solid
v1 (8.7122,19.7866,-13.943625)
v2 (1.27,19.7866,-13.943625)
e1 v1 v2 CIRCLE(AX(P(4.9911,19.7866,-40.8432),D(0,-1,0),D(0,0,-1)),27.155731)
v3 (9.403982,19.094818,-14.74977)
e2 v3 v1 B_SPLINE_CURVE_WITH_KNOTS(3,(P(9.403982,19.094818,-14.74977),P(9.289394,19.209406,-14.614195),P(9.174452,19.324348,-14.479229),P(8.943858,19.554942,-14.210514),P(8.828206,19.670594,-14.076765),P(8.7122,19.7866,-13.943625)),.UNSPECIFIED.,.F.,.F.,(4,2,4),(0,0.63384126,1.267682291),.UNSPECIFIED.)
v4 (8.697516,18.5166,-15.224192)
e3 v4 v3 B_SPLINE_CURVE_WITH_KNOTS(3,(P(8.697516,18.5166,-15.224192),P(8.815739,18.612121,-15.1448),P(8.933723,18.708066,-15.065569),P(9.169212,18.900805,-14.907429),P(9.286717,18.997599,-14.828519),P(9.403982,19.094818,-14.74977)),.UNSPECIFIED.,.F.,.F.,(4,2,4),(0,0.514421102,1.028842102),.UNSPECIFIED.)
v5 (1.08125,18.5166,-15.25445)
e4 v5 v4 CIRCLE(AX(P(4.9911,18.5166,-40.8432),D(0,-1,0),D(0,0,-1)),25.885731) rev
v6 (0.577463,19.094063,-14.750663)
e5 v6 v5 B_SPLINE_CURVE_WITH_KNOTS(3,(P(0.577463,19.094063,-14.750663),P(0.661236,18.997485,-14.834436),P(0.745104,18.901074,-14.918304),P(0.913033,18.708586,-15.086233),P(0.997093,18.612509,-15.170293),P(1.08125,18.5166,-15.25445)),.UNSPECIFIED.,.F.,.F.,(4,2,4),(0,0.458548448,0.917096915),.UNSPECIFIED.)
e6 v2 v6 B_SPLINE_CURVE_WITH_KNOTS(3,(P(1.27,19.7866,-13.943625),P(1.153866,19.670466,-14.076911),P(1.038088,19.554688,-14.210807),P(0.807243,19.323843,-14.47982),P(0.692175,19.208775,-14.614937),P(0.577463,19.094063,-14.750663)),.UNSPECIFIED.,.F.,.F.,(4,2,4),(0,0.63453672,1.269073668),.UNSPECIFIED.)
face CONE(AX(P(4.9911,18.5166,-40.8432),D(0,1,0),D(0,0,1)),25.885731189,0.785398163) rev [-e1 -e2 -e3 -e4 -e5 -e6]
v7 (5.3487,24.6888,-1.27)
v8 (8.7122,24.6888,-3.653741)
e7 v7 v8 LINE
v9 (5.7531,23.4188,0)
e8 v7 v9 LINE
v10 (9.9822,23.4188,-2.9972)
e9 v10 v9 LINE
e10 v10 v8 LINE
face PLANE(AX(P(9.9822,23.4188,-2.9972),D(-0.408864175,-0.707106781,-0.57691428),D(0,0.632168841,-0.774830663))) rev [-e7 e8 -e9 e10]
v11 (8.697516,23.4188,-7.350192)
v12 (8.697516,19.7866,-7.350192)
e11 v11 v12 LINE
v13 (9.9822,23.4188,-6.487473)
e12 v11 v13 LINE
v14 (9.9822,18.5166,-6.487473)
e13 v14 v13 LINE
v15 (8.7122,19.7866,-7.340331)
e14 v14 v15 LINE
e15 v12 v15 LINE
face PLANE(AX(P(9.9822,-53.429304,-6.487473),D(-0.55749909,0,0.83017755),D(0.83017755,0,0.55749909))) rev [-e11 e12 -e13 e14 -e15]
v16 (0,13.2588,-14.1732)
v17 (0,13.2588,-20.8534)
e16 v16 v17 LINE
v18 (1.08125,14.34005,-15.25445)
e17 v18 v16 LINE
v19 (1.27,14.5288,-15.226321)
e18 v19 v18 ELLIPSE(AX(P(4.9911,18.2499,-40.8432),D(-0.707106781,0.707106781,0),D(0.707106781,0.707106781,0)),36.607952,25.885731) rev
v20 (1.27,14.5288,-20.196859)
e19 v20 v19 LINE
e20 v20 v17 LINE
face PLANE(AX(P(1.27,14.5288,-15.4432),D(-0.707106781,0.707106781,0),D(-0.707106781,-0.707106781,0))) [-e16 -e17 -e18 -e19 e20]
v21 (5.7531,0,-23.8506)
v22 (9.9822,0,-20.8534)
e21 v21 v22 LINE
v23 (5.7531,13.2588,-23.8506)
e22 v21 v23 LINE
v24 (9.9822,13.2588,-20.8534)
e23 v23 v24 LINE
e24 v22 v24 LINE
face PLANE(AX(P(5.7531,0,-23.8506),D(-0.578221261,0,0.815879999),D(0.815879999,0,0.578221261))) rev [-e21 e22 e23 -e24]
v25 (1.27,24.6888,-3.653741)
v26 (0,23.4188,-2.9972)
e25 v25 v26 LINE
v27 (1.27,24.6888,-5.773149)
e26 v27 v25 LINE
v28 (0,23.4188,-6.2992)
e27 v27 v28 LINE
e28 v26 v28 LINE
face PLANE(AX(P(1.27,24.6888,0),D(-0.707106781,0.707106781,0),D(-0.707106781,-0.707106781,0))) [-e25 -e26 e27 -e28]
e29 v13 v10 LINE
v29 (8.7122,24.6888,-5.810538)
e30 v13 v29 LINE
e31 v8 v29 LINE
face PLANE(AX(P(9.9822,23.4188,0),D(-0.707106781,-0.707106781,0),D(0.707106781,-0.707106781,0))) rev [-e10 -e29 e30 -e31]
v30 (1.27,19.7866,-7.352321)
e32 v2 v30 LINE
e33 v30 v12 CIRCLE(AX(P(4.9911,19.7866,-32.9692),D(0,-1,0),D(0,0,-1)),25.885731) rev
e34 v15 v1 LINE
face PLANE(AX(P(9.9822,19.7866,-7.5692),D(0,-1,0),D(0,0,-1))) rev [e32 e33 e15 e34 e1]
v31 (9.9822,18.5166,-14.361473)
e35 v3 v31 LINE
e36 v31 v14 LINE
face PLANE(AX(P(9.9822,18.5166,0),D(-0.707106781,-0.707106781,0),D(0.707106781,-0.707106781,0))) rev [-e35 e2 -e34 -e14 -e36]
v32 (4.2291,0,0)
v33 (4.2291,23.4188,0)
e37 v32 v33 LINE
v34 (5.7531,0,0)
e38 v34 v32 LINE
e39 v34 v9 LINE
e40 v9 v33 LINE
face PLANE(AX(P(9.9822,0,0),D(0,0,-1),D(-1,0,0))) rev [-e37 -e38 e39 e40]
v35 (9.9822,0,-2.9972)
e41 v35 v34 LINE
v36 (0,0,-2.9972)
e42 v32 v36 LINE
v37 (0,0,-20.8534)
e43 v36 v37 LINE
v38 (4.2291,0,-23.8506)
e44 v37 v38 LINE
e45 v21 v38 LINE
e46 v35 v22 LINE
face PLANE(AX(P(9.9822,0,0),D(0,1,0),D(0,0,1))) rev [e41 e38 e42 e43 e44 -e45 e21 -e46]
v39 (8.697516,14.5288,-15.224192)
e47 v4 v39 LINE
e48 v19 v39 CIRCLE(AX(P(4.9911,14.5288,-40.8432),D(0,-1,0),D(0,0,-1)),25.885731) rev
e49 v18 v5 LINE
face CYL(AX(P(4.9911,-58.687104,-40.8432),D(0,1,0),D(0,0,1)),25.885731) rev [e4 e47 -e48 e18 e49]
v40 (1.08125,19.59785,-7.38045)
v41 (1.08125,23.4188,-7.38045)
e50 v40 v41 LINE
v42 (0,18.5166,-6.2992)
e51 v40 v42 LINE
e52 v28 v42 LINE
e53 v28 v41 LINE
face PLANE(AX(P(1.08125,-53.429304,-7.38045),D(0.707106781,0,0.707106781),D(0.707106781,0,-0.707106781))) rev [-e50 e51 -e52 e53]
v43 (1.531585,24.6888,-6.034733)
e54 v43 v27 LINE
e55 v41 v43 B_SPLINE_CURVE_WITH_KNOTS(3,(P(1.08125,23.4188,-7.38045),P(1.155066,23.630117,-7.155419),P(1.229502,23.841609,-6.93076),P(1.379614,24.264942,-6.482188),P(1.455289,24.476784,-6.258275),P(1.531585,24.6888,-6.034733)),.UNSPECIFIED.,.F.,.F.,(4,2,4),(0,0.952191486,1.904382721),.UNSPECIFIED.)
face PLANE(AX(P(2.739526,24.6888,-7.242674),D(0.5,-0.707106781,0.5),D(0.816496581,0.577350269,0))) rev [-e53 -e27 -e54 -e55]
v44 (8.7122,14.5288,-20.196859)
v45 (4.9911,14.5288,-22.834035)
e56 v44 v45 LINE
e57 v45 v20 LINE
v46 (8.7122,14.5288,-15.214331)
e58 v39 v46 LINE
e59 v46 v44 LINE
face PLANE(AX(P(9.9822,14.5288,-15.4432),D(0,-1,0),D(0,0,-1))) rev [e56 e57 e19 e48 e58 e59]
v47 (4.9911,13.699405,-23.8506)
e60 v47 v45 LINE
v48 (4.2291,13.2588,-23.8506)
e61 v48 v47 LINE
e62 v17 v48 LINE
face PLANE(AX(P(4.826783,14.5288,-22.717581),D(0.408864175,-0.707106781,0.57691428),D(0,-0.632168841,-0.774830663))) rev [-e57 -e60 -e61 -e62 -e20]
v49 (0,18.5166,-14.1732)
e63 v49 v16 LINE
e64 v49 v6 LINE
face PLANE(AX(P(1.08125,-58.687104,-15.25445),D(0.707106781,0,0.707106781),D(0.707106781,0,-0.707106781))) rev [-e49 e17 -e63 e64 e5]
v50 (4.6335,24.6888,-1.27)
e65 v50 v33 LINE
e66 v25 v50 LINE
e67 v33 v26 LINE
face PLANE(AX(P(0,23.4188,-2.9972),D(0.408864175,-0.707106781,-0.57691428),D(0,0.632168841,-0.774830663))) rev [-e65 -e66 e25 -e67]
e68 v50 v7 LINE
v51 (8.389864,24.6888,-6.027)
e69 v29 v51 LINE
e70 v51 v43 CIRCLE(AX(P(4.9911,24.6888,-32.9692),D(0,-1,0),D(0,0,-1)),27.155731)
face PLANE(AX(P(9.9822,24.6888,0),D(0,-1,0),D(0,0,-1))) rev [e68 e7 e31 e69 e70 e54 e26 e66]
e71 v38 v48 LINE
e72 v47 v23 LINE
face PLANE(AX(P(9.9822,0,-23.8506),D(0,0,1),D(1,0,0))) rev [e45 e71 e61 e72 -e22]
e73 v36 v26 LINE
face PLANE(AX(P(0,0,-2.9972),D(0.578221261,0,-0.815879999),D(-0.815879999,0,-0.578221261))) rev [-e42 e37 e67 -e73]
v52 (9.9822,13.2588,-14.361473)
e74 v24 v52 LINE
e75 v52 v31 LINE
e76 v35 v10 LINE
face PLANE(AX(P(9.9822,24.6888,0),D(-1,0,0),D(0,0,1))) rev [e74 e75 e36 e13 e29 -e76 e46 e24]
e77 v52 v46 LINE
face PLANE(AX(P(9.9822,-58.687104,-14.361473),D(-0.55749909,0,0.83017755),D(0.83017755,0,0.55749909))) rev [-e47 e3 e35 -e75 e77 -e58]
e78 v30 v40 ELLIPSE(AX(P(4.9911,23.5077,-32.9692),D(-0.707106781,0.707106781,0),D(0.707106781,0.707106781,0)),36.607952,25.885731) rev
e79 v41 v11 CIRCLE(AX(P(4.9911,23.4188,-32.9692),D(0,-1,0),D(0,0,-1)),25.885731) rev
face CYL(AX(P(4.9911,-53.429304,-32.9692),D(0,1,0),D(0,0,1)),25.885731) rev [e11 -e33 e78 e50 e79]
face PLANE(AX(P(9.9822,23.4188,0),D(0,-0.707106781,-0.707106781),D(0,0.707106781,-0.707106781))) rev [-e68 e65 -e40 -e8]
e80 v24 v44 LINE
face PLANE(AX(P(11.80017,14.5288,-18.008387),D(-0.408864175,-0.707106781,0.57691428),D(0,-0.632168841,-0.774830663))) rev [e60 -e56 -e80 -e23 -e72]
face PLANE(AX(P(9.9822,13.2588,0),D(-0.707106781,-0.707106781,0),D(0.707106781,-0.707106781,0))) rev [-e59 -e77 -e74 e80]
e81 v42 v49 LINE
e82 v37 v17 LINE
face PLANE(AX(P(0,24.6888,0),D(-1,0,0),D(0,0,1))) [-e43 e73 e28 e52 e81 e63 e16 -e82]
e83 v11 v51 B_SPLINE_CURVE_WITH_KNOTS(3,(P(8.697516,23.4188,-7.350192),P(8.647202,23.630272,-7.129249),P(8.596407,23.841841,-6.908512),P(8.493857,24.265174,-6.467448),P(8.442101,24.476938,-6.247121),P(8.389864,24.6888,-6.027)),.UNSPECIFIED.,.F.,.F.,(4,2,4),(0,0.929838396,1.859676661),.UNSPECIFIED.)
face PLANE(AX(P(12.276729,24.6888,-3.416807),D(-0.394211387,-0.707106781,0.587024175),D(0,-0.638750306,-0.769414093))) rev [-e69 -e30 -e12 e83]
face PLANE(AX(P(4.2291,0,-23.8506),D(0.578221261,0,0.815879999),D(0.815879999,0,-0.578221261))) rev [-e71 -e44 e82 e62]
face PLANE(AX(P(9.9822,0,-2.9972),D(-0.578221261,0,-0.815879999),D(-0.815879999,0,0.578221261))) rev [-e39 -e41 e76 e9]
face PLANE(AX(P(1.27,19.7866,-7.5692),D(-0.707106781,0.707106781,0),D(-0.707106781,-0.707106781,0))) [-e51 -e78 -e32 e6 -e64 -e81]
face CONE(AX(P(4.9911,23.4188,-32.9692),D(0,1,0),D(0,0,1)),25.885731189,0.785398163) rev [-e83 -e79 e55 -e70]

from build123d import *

# Parameters (mm, degrees)
EXTRUDE1_DEPTH     = 9.9822
CUT_EXTRUDE1_DEPTH = 36.749577377
SKETCH3_R          = 25.885731189
CUT_EXTRUDE2_DEPTH = 4.9022
SKETCH4_R          = 25.885731189
CUT_EXTRUDE3_DEPTH = 5.2578
CHAMFER1_SIZE      = 1.08172717
CHAMFER1_SIZE_2    = 1.27
CHAMFER2_SIZE      = 1.27
CHAMFER3_SIZE      = 1.27
CHAMFER4_SIZE      = 1.27


with BuildPart() as part:
    # Sketch1 → Extrude1 (new body)
    with BuildSketch(Plane(origin=(0, 0, 0), x_dir=(0, 0, -1), z_dir=(1, 0, 0))):
        Polygon((7.5692, 24.6888), (7.5692, 19.7866), (15.4432, 19.7866), (15.4432, 14.5288), (23.8506, 14.5288), (23.8506, 0), (0, 0), (0, 24.6888), align=None)
    extrude(amount=EXTRUDE1_DEPTH)

    # Sketch2 → Cut-Extrude1 (cut, through all)
    with BuildSketch(Plane(origin=(0, 24.6888, 0), x_dir=(1, 0, 0), z_dir=(0, 1, 0))):
        Polygon((0, 2.9972), (4.2291, 0), (0, 0), align=None)
        Polygon((9.9822, 2.9972), (9.9822, 0), (5.7531, 0), align=None)
        Polygon((0, 23.8506), (4.2291, 23.8506), (0, 20.8534), align=None)
        Polygon((9.9822, 20.8534), (9.9822, 23.8506), (5.7531, 23.8506), align=None)
    extrude(amount=-CUT_EXTRUDE1_DEPTH, mode=Mode.SUBTRACT)

    # Sketch3 → Cut-Extrude2 (cut)
    with BuildSketch(Plane(origin=(0, 24.6888, 0), x_dir=(1, 0, 0), z_dir=(0, 1, 0))):
        with Locations((4.9911, 32.9692)):
            Circle(SKETCH3_R)
    extrude(amount=-CUT_EXTRUDE2_DEPTH, mode=Mode.SUBTRACT)

    # Sketch4 → Cut-Extrude3 (cut)
    with BuildSketch(Plane(origin=(0, 19.7866, 0), x_dir=(1, 0, 0), z_dir=(0, 1, 0))):
        with Locations((4.9911, 40.8432)):
            Circle(SKETCH4_R)
    extrude(amount=-CUT_EXTRUDE3_DEPTH, mode=Mode.SUBTRACT)

    # Chamfer1
    # the kernel refuses this chamfer: 1.27, 1.08172717 mm, written as the material it takes off along each edge
    with BuildSketch(Plane(origin=(9.9822, 23.137823144, -15.4432), x_dir=(-0.9857782143008734, 0, 0.168051516535202), z_dir=(0, -1, 0))) as chamfer1_piece_1:
        with BuildLine():
            Line((1.303218251, 0), (CHAMFER1_SIZE * 0.168051516609, -CHAMFER1_SIZE * 0.985778214731))
            Line((CHAMFER1_SIZE * 0.168051516609, -CHAMFER1_SIZE * 0.985778214731), (0, 0))
            ThreePointArc((0, 0), (0.67003435, -0.008196065), (1.303218251, 0))
        make_face()
    extrude(amount=8.609023144, mode=Mode.SUBTRACT)
    with BuildSketch(Plane(origin=(9.9822, 28.040023144, -7.5692), x_dir=(0, 0, 1), z_dir=(0, -1, 0))) as chamfer1_piece_2:
        with BuildLine():
            Line((CHAMFER1_SIZE, 0), (0.219007803, 1.28468416))
            ThreePointArc((0.219007803, 1.28468416), (0.12067979, 0.659127904), (0, 0))
            Line((0, 0), (CHAMFER1_SIZE, 0))
        make_face()
    extrude(amount=8.253423144, mode=Mode.SUBTRACT)
    with BuildSketch(Plane(origin=(0, 27.954837395, -7.5692), x_dir=(0.9851028173062452, 0, 0.1719663901327771), z_dir=(0, -1, 0))) as chamfer1_piece_3:
        with BuildLine():
            Line((1.097600724, 0), (CHAMFER1_SIZE_2 * 0.171966390133, CHAMFER1_SIZE_2 * 0.985102817306))
            Line((CHAMFER1_SIZE_2 * 0.171966390133, CHAMFER1_SIZE_2 * 0.985102817306), (0, 0))
            ThreePointArc((0, 0), (0.563419729, 0.005814052), (1.097600724, 0))
        make_face()
    extrude(amount=8.168237395, mode=Mode.SUBTRACT)
    with BuildSketch(Plane(origin=(0, 23.052637395, -15.4432), x_dir=(0.985102817306246, 0, 0.17196639013277196), z_dir=(0, -1, 0))) as chamfer1_piece_4:
        with BuildLine():
            Line((1.097600724, 0), (CHAMFER1_SIZE_2 * 0.171966390133, CHAMFER1_SIZE_2 * 0.985102817306))
            Line((CHAMFER1_SIZE_2 * 0.171966390133, CHAMFER1_SIZE_2 * 0.985102817306), (0, 0))
            ThreePointArc((0, 0), (0.563419729, 0.005814052), (1.097600724, 0))
        make_face()
    extrude(amount=8.523837395, mode=Mode.SUBTRACT)

    # Chamfer2
    # the kernel refuses this chamfer: 1.27 mm, written as the material it takes off along each edge
    with BuildSketch(Plane(origin=(3.088405412, 24.6888, 1.88849226), x_dir=(0, -1, 0), z_dir=(0.8158799994392605, 0, -0.5782212608638604))) as chamfer2_piece_1:
        Polygon((CHAMFER2_SIZE, 0), (0, CHAMFER2_SIZE), (0, 0), align=None)
    extrude(amount=11.715557658, mode=Mode.SUBTRACT)
    with BuildSketch(Plane(origin=(0.963062605, 24.6888, 0), x_dir=(0, 0, -1), z_dir=(1, 0, 0))) as chamfer2_piece_2:
        Polygon((CHAMFER2_SIZE, 0), (0, -CHAMFER2_SIZE), (0, 0), align=None)
    extrude(amount=8.056074789, mode=Mode.SUBTRACT)
    with BuildSketch(Plane(origin=(-2.664694588, 24.6888, -4.88569226), x_dir=(0.5782212608638604, 0, -0.8158799994392603), z_dir=(0.8158799994392604, 0, 0.5782212608638605))) as chamfer2_piece_3:
        Polygon((CHAMFER2_SIZE, 0), (0, -CHAMFER2_SIZE), (0, 0), align=None)
    extrude(amount=11.715557658, mode=Mode.SUBTRACT)
    with BuildSketch(Plane(origin=(0, 24.6888, 0.268837395), x_dir=(1, 0, 0), z_dir=(0, 0, -1))) as chamfer2_piece_4:
        Polygon((CHAMFER2_SIZE, 0), (0, CHAMFER2_SIZE), (0, 0), align=None)
    extrude(amount=9.834074789, mode=Mode.SUBTRACT)
    with BuildSketch(Plane(origin=(3.390686755, 24.6888, -9.689886755), x_dir=(0.7071067811864264, 0, 0.7071067811866687), z_dir=(-0.7071067811866687, 0, 0.7071067811864264))) as chamfer2_piece_5:
        Polygon((CHAMFER2_SIZE, 0), (0, -CHAMFER2_SIZE), (0, 0), align=None)
    extrude(amount=8.061192589, mode=Mode.SUBTRACT)
    with BuildSketch(Plane(origin=(4.9911, 24.6888, -32.9692), x_dir=(-0.27423691753181434, 0, 0.9616621616049208), z_dir=(-0.9616621616049208, 0, -0.27423691753181434))) as chamfer2_piece_6:
        Polygon((25.885731189 + CHAMFER2_SIZE, 0), (25.885731189, -CHAMFER2_SIZE), (25.885731189, 0), align=None)
    revolve(axis=Axis((4.9911, 24.6888, -32.9692), (0, 1, 0)), revolution_arc=31.377850279, mode=Mode.SUBTRACT)
    with BuildSketch(Plane(origin=(12.693590923, 24.6888, -4.666659955), x_dir=(-0.5574990899678705, 0, 0.8301775500969635), z_dir=(-0.8301775500969636, 0, -0.5574990899678705))) as chamfer2_piece_7:
        Polygon((CHAMFER2_SIZE, 0), (0, -CHAMFER2_SIZE), (0, 0), align=None)
    extrude(amount=8.079556, mode=Mode.SUBTRACT)
    with BuildSketch(Plane(origin=(9.9822, 24.6888, 0.268837395), x_dir=(-1, 0, 0), z_dir=(0, 0, -1))) as chamfer2_piece_8:
        Polygon((CHAMFER2_SIZE, 0), (0, -CHAMFER2_SIZE), (0, 0), align=None)
    extrude(amount=10.022347619, mode=Mode.SUBTRACT)
    with BuildSketch(Plane(origin=(9.9822, 14.5288, -24.119437395), x_dir=(-1, 0, 0), z_dir=(0, 0, 1))) as chamfer2_piece_9_section:
        Polygon((CHAMFER2_SIZE, 0), (0, CHAMFER2_SIZE), (0, 0), align=None)
    chamfer2_piece_9 = extrude(amount=13.02400196, mode=Mode.PRIVATE)
    chamfer2_piece_9 = split(chamfer2_piece_9, bisect_by=Plane(origin=(5.465987334, 14.5288, -17.394299305), z_dir=(0.5574990901783627, 0, -0.8301775499556092)), keep=Keep.TOP, mode=Mode.PRIVATE)
    add(chamfer2_piece_9, mode=Mode.SUBTRACT)
    with BuildSketch(Plane(origin=(0, 14.5288, -10.907162605), x_dir=(1, 0, 0), z_dir=(0, 0, -1))) as chamfer2_piece_10_section:
        Polygon((CHAMFER2_SIZE, 0), (0, CHAMFER2_SIZE), (0, 0), align=None)
    chamfer2_piece_10 = extrude(amount=13.212274789, mode=Mode.PRIVATE)
    chamfer2_piece_10 = split(chamfer2_piece_10, bisect_by=Plane(origin=(-1.633018697, 14.5288, -12.540181303), z_dir=(-0.7071067811864264, 0, -0.7071067811866687)), keep=Keep.TOP, mode=Mode.PRIVATE)
    chamfer2_piece_10 = chamfer2_piece_10 - Plane(origin=(4.9911, 14.5288, -40.8432), x_dir=(1, 0, 0), z_dir=(0, 1, 0)) * Cylinder(25.885731189, 32, mode=Mode.PRIVATE)
    add(chamfer2_piece_10, mode=Mode.SUBTRACT)
    with BuildSketch(Plane(origin=(0, 14.5288, -10.907162605), x_dir=(1, 0, 0), z_dir=(0, 0, -1))) as chamfer2_piece_11_section:
        Polygon((CHAMFER2_SIZE, 0), (0, CHAMFER2_SIZE), (0, 0), align=None)
    chamfer2_piece_11 = extrude(amount=13.212274789, mode=Mode.PRIVATE)
    chamfer2_piece_11 = split(chamfer2_piece_11, bisect_by=Plane(origin=(-1.633018697, 14.5288, -12.540181303), z_dir=(0.7071067811864264, 0, 0.7071067811866687)), keep=Keep.TOP, mode=Mode.PRIVATE)
    chamfer2_piece_11 = chamfer2_piece_11 & Plane(origin=(4.9911, 14.5288, -40.8432), x_dir=(1, 0, 0), z_dir=(0, 1, 0)) * Cylinder(25.885731189, 32, mode=Mode.PRIVATE)
    add(chamfer2_piece_11, mode=Mode.SUBTRACT)
    with BuildSketch(Plane(origin=(0, 14.5288, -10.907162605), x_dir=(1, 0, 0), z_dir=(0, 0, -1))) as chamfer2_piece_12_section:
        Polygon((CHAMFER2_SIZE, 0), (0, CHAMFER2_SIZE), (0, 0), align=None)
    chamfer2_piece_12 = extrude(amount=13.212274789, mode=Mode.PRIVATE)
    chamfer2_piece_12 = split(chamfer2_piece_12, bisect_by=Plane(origin=(-1.633018697, 14.5288, -12.540181303), z_dir=(-0.7071067811864264, 0, -0.7071067811866687)), keep=Keep.TOP, mode=Mode.PRIVATE)
    chamfer2_piece_12 = chamfer2_piece_12 & Plane(origin=(4.9911, 14.5288, -40.8432), x_dir=(1, 0, 0), z_dir=(0, 1, 0)) * Cylinder(25.885731189, 32, mode=Mode.PRIVATE)
    add(chamfer2_piece_12, mode=Mode.SUBTRACT)
    with BuildSketch(Plane(origin=(0, 19.7866, -17.439237395), x_dir=(1, 0, 0), z_dir=(0, 0, 1))) as chamfer2_piece_13_section:
        Polygon((CHAMFER2_SIZE, 0), (0, -CHAMFER2_SIZE), (0, 0), align=None)
    chamfer2_piece_13 = extrude(amount=14.406074789, mode=Mode.PRIVATE)
    chamfer2_piece_13 = chamfer2_piece_13 & Plane(origin=(4.9911, 19.7866, -32.9692), x_dir=(1, 0, 0), z_dir=(0, 1, 0)) * Cylinder(25.885731189, 34, mode=Mode.PRIVATE)
    chamfer2_piece_13 = split(chamfer2_piece_13, bisect_by=Plane(origin=(5.570018697, 19.7866, -11.869218697), z_dir=(-0.7071067811864264, 0, -0.7071067811866687)), keep=Keep.TOP, mode=Mode.PRIVATE)
    add(chamfer2_piece_13, mode=Mode.SUBTRACT)
    with BuildSketch(Plane(origin=(0, 19.7866, -17.439237395), x_dir=(1, 0, 0), z_dir=(0, 0, 1))) as chamfer2_piece_14_section:
        Polygon((CHAMFER2_SIZE, 0), (0, -CHAMFER2_SIZE), (0, 0), align=None)
    chamfer2_piece_14 = extrude(amount=14.406074789, mode=Mode.PRIVATE)
    chamfer2_piece_14 = chamfer2_piece_14 - Plane(origin=(4.9911, 19.7866, -32.9692), x_dir=(1, 0, 0), z_dir=(0, 1, 0)) * Cylinder(25.885731189, 34, mode=Mode.PRIVATE)
    chamfer2_piece_14 = split(chamfer2_piece_14, bisect_by=Plane(origin=(5.570018697, 19.7866, -11.869218697), z_dir=(-0.7071067811864264, 0, -0.7071067811866687)), keep=Keep.TOP, mode=Mode.PRIVATE)
    add(chamfer2_piece_14, mode=Mode.SUBTRACT)
    with BuildSketch(Plane(origin=(0, 19.7866, -17.439237395), x_dir=(1, 0, 0), z_dir=(0, 0, 1))) as chamfer2_piece_15_section:
        Polygon((CHAMFER2_SIZE, 0), (0, -CHAMFER2_SIZE), (0, 0), align=None)
    chamfer2_piece_15 = extrude(amount=14.406074789, mode=Mode.PRIVATE)
    chamfer2_piece_15 = chamfer2_piece_15 & Plane(origin=(4.9911, 19.7866, -32.9692), x_dir=(1, 0, 0), z_dir=(0, 1, 0)) * Cylinder(25.885731189, 34, mode=Mode.PRIVATE)
    chamfer2_piece_15 = split(chamfer2_piece_15, bisect_by=Plane(origin=(5.570018697, 19.7866, -11.869218697), z_dir=(0.7071067811864264, 0, 0.7071067811866687)), keep=Keep.TOP, mode=Mode.PRIVATE)
    add(chamfer2_piece_15, mode=Mode.SUBTRACT)
    with BuildSketch(Plane(origin=(9.9822, 19.7866, -3.221435435), x_dir=(-1, 0, 0), z_dir=(0, 0, -1))) as chamfer2_piece_16_section:
        Polygon((CHAMFER2_SIZE, 0), (0, -CHAMFER2_SIZE), (0, 0), align=None)
    chamfer2_piece_16 = extrude(amount=14.406074789, mode=Mode.PRIVATE)
    chamfer2_piece_16 = split(chamfer2_piece_16, bisect_by=Plane(origin=(11.493797972, 19.7866, -5.472371309), z_dir=(0.5574990899678705, 0, -0.8301775500969636)), keep=Keep.TOP, mode=Mode.PRIVATE)
    add(chamfer2_piece_16, mode=Mode.SUBTRACT)

    # Chamfer3
    chamfer3_edges = [part.edges().sort_by_distance(p)[0] for p in [
        (7.23265, 14.5288, -22.80203003),
        (4.983681173, 19.7866, -14.957469874),
    ]]
    chamfer(chamfer3_edges, length=CHAMFER3_SIZE)

    # Chamfer4
    chamfer4_edges = [part.edges().sort_by_distance(p)[0] for p in [
        (2.581452238, 14.5288, -22.682897683),
    ]]
    chamfer(chamfer4_edges, length=CHAMFER4_SIZE)


solid = part.part
